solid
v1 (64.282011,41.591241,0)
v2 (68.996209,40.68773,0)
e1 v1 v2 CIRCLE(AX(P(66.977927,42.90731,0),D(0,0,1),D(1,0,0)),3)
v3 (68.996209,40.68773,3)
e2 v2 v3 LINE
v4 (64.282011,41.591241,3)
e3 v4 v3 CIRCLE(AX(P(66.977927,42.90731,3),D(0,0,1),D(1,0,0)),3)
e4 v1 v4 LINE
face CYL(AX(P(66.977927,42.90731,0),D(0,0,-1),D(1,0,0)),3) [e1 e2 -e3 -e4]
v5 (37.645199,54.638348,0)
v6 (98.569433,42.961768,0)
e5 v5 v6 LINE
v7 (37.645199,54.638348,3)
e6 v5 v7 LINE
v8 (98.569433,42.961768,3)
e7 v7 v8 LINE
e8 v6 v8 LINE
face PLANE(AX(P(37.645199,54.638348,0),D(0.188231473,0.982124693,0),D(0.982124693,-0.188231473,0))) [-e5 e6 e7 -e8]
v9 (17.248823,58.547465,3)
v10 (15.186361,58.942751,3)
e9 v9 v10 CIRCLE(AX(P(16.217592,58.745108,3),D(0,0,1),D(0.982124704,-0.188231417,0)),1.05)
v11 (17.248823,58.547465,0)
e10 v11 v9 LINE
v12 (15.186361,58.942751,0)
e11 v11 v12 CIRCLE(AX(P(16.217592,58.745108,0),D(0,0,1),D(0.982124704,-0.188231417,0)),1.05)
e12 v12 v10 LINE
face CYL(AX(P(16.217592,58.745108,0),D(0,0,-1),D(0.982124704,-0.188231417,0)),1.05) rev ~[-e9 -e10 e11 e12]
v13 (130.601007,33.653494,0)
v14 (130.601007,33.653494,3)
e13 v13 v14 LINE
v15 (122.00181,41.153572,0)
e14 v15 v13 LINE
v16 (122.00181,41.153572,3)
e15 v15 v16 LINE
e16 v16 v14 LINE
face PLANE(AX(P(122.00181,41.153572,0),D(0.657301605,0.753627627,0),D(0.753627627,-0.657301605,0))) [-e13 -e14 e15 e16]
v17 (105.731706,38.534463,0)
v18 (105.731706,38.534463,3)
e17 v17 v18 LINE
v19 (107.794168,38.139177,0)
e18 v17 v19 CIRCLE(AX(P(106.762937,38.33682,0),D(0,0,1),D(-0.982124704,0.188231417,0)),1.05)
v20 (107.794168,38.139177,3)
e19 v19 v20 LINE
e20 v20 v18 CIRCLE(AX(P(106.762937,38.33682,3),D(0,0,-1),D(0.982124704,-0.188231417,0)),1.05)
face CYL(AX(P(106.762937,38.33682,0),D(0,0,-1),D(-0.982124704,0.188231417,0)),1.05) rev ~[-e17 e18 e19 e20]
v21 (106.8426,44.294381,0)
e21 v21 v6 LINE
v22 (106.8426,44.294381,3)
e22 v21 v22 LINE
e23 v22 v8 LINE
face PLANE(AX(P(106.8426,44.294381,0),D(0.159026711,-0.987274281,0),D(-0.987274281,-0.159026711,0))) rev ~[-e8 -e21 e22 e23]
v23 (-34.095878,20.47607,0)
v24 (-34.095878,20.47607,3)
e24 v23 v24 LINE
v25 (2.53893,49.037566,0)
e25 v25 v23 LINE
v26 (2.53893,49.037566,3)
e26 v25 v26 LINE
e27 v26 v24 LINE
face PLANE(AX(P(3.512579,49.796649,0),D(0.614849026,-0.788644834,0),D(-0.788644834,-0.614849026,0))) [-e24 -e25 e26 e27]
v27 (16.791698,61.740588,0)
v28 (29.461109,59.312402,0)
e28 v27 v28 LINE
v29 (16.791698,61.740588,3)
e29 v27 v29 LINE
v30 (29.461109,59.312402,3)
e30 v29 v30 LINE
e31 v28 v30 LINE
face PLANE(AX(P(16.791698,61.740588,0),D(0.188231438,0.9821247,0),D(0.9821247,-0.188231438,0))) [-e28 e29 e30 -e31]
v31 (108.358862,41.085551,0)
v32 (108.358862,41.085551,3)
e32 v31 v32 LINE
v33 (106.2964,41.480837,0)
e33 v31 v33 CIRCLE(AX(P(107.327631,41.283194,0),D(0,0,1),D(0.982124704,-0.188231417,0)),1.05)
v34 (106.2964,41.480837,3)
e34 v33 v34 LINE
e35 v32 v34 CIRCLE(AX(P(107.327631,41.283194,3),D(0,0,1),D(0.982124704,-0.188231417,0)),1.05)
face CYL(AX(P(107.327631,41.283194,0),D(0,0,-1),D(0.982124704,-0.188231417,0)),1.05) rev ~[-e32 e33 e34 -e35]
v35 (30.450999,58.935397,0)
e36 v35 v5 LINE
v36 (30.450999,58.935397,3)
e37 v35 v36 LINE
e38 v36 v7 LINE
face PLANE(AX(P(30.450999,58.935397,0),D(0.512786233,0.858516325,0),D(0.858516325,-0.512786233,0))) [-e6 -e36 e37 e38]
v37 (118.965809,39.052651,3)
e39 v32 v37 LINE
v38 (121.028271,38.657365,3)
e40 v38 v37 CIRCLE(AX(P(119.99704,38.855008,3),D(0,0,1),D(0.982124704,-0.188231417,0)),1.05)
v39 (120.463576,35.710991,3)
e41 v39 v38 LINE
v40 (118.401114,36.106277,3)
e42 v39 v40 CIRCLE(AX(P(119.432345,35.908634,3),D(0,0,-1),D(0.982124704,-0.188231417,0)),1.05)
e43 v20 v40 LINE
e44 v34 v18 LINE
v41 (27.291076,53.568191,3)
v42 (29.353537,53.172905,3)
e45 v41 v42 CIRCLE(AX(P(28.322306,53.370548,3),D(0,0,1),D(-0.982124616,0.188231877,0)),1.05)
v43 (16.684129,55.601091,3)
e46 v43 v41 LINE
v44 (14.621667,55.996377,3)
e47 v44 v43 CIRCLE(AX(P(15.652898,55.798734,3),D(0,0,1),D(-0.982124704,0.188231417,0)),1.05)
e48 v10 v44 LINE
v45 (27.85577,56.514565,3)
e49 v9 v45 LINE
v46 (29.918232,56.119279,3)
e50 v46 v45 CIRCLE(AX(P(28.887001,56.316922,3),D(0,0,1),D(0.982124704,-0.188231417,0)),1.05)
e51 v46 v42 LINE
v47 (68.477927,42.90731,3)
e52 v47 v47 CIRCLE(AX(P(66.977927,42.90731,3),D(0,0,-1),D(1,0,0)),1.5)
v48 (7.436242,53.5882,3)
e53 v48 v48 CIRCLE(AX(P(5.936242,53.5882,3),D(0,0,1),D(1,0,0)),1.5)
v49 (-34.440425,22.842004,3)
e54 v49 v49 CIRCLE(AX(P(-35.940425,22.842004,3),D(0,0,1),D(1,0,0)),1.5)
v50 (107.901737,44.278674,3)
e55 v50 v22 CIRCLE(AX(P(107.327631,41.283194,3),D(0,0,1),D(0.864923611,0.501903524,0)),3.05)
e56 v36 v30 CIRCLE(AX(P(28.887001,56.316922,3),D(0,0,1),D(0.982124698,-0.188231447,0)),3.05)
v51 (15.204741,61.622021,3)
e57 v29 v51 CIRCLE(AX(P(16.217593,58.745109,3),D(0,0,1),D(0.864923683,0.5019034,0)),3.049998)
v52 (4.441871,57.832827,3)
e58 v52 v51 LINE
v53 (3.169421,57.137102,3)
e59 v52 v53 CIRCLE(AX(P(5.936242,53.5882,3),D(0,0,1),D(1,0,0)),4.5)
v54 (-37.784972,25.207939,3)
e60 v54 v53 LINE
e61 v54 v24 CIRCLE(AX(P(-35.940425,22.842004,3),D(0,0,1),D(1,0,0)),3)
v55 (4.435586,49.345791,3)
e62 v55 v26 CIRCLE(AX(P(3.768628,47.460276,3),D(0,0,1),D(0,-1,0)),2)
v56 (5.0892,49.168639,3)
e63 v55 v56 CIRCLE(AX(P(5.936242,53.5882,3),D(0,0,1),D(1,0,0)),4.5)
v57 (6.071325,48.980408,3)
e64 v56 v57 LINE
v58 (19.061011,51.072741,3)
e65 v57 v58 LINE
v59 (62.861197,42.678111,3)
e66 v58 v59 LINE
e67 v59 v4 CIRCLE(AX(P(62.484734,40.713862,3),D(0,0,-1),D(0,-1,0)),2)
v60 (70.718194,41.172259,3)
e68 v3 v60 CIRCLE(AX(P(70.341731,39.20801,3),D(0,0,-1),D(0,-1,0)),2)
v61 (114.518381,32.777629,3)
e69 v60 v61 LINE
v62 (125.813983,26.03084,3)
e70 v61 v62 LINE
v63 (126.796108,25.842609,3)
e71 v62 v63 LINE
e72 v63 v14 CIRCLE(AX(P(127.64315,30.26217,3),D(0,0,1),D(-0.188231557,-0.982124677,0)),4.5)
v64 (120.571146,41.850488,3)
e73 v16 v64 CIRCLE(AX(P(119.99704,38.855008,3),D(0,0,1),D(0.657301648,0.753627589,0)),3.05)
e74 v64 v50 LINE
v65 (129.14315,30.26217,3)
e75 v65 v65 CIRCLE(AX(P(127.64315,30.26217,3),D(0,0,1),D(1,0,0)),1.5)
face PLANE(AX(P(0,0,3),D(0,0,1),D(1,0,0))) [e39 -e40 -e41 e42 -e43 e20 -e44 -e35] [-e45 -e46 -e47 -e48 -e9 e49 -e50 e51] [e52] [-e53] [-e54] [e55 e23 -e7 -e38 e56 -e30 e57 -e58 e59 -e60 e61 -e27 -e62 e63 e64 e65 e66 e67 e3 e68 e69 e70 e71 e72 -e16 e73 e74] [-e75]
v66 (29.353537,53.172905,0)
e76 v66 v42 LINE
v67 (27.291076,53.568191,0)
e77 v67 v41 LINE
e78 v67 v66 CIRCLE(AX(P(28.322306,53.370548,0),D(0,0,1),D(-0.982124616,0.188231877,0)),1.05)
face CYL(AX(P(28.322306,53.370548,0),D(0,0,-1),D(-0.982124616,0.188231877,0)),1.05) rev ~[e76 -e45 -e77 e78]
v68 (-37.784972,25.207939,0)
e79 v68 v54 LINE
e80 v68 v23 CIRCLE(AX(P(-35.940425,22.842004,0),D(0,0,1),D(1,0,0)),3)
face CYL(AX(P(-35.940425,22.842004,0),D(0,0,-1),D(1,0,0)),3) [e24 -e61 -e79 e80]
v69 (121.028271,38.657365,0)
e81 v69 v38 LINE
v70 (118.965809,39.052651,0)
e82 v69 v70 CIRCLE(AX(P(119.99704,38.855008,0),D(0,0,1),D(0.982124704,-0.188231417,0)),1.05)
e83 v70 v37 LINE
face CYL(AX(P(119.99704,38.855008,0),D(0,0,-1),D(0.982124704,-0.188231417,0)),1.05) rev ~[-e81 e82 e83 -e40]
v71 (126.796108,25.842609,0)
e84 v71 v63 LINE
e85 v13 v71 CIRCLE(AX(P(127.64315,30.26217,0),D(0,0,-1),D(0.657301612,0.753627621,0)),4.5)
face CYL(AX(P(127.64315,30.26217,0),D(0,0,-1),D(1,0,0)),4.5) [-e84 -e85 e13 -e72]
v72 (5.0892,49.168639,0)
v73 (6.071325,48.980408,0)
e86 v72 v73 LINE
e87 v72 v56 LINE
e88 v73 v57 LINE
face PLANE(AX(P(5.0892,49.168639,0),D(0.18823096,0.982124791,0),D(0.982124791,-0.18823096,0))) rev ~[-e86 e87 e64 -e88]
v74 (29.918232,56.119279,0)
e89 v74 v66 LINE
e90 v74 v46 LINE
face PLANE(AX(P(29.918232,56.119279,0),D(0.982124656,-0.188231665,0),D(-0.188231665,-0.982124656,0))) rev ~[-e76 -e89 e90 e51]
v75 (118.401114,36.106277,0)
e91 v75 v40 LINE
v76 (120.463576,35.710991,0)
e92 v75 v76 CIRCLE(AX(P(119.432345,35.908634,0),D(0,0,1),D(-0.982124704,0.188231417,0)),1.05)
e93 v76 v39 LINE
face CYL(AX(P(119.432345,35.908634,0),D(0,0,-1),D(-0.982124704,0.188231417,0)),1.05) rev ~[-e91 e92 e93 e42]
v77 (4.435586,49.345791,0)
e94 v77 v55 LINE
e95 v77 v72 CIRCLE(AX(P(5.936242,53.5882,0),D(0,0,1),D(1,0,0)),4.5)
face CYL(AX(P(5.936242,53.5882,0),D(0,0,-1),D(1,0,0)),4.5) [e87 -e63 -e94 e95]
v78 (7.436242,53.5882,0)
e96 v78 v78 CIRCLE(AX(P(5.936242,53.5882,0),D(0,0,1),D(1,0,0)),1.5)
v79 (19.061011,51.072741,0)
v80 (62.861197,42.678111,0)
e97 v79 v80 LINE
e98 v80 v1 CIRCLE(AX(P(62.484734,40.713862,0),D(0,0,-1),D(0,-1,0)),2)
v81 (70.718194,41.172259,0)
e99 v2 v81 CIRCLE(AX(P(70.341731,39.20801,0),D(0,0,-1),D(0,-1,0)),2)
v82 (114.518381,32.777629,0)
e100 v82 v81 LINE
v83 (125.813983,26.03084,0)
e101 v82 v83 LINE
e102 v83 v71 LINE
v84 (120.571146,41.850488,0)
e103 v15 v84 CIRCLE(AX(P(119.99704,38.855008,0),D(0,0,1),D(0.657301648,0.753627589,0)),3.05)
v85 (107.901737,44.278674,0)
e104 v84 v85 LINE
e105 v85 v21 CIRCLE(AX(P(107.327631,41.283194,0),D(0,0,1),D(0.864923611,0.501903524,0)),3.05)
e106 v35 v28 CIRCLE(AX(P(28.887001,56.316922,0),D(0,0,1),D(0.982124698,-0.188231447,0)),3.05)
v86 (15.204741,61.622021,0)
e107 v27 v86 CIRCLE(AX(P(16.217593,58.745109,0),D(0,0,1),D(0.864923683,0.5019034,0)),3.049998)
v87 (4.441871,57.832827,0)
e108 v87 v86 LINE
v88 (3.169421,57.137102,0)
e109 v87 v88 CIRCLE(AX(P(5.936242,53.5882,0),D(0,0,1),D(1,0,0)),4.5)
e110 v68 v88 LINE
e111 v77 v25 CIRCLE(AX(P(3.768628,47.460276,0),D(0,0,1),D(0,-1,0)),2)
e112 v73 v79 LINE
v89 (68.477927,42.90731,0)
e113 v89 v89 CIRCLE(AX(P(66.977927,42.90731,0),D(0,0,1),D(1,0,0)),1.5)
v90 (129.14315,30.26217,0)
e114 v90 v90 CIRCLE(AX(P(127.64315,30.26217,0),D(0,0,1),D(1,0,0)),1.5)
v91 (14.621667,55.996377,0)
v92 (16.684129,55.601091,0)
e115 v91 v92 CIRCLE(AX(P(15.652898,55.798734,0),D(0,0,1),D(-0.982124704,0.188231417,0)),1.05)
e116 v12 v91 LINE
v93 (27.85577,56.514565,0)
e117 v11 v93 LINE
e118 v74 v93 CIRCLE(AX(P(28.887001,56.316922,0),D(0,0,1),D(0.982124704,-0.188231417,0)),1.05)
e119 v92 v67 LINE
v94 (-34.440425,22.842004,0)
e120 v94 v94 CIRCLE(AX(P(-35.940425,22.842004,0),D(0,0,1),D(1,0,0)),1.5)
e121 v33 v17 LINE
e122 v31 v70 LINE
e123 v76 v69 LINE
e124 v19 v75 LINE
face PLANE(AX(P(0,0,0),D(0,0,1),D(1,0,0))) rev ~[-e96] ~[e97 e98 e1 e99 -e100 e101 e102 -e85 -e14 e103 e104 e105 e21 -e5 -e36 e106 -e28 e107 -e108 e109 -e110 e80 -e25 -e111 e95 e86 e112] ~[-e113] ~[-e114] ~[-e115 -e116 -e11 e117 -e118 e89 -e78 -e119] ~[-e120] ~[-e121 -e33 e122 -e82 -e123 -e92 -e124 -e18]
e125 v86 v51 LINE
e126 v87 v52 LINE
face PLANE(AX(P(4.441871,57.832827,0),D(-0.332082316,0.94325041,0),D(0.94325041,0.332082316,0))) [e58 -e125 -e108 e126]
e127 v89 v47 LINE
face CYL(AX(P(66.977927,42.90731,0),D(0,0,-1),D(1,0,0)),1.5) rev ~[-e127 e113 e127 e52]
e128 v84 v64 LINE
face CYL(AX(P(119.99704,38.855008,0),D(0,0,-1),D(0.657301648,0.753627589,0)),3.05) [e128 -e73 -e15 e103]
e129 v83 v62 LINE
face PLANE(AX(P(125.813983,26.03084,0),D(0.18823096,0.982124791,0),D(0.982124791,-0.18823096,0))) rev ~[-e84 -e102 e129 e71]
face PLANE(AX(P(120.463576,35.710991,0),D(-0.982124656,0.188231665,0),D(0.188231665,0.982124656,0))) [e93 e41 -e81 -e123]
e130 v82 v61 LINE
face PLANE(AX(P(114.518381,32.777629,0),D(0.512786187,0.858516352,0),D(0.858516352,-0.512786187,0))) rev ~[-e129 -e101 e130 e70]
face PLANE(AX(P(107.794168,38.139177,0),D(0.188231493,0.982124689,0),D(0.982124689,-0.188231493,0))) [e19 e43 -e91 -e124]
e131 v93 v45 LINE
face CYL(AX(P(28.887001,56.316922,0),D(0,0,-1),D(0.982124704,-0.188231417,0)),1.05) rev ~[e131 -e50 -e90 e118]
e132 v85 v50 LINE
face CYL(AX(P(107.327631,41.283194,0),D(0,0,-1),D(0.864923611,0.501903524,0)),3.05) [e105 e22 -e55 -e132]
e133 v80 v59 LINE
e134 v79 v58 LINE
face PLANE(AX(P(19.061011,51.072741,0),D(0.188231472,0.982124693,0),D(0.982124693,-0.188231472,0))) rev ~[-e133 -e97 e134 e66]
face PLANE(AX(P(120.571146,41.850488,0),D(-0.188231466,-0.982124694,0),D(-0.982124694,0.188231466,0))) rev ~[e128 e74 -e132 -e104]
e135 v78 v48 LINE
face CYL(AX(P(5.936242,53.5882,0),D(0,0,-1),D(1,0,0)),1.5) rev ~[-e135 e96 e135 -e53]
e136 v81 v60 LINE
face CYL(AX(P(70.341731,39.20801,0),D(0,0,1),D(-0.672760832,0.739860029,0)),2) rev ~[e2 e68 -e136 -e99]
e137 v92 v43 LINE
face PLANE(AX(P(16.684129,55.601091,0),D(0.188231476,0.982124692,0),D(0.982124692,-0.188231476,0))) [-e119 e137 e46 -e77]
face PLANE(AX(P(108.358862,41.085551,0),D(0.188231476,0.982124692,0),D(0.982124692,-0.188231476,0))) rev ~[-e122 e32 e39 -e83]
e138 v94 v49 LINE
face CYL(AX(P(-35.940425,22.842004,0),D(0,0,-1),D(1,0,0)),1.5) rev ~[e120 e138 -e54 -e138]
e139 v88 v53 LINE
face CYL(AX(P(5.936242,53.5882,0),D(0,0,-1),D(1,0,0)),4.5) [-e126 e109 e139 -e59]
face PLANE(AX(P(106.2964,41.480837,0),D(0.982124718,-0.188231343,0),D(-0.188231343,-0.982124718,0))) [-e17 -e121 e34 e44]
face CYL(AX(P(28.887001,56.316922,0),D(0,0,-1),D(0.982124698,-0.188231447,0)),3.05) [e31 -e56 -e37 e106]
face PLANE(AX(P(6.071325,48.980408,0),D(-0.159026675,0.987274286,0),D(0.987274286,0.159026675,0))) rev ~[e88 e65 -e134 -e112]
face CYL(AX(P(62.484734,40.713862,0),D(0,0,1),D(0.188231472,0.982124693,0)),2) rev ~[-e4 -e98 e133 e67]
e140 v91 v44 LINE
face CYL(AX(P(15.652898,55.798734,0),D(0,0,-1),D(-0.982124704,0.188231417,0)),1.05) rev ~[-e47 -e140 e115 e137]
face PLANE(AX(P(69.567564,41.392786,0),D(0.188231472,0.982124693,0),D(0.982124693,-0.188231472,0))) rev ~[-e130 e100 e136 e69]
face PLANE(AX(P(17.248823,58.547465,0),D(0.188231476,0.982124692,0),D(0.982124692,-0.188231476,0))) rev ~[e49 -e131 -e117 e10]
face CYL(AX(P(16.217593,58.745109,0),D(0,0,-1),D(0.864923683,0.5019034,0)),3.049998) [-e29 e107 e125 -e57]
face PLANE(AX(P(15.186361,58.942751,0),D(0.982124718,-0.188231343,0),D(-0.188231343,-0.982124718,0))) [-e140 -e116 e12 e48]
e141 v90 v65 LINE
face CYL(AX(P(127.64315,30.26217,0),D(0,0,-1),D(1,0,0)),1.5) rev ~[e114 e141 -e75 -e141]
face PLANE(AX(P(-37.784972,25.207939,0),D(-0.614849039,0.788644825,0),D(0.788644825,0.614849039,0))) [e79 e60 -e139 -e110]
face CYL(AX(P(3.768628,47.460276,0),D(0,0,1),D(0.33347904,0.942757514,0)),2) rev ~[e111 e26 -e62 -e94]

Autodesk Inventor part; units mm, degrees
ref_plane "YZ Plane" through (0, 0, 0) normal (1, 0, 0) x (0, 1, 0)
ref_plane "XZ Plane" through (0, 0, 0) normal (0, 1, 0) x (-1, 0, 0)
ref_plane "XY Plane" through (0, 0, 0) normal (0, 0, 1) x (1, 0, 0)
sketch "スケッチ1" plane through (0, 0, 0) normal (0, 0, 1) x (1, 0, 0)
  circle A0 centre (127.64315, 30.26217) radius 1.5
  circle A1 centre (5.936242, 53.5882) radius 1.5
  line L0 (5.936242, 53.5882) -> (127.64315, 30.26217) construction
  circle A2 centre (5.936242, 53.5882) radius 4.025
  circle A3 centre (127.64315, 30.26217) radius 4.025
  arc A4 (127.25169, 23.248085) -> (128.965476, 37.161596) centre (127.64315, 30.26217) ccw
  line L1 (12.835668, 52.265874) -> (13.400362, 55.212248)
  line L2 (15.462824, 54.816962) -> (26.069771, 52.784062)
  line L3 (28.132233, 52.388776) -> (27.567538, 49.442402)
  line L4 (14.89813, 51.870588) -> (25.505076, 49.837688)
  line L5 (120.743724, 31.584496) -> (121.308418, 34.53087)
  line L6 (119.245956, 34.926156) -> (108.63901, 36.959056)
  line L7 (106.576548, 37.354342) -> (106.011853, 34.407968)
  line L8 (108.074315, 34.012682) -> (118.681262, 31.979782)
  circle A5 centre (19.354562, 46.434577) radius 3
  circle A6 centre (112.530747, 28.576671) radius 3
  line L9 (7.258568, 60.487626) -> (128.965476, 37.161596)
  arc A7 (17.926333, 42.16724) -> (21.546529, 42.504529) centre (19.354562, 46.434577) ccw
  arc A8 (109.041036, 25.735559) -> (112.27999, 24.083663) centre (112.530747, 28.576671) ccw
  line L10 (3.706619, 46.926413) -> (17.926333, 42.16724)
  line L11 (112.27999, 24.083663) -> (127.25169, 23.248085)
  circle A9 centre (19.354562, 46.434577) radius 1.5
  circle A10 centre (112.530747, 28.576671) radius 1.5
  line L12 (32.344248, 48.52691) -> (21.546529, 42.504529)
  line L13 (109.041036, 25.735559) -> (101.235144, 35.32346)
  line L14 (32.344248, 48.52691) -> (101.235144, 35.32346)
  arc A11 (108.63901, 36.959056) -> (106.576548, 37.354342) centre (107.607779, 37.156699) ccw
  arc A12 (106.011853, 34.407968) -> (108.074315, 34.012682) centre (107.043084, 34.210325) ccw
  arc A13 (121.308418, 34.53087) -> (119.245956, 34.926156) centre (120.277187, 34.728513) ccw
  arc A14 (118.681262, 31.979782) -> (120.743724, 31.584496) centre (119.712493, 31.782139) ccw
  arc A15 (28.132233, 52.388776) -> (26.069771, 52.784062) centre (27.101002, 52.586419) ccw
  arc A16 (25.505076, 49.837688) -> (27.567538, 49.442402) centre (26.536307, 49.640045) ccw
  arc A17 (15.462824, 54.816962) -> (13.400362, 55.212248) centre (14.431593, 55.014605) ccw
  arc A18 (12.835668, 52.265874) -> (14.89813, 51.870588) centre (13.866899, 52.068231) ccw
  line L15 (5.936242, 53.5882) -> (-35.940425, 22.842004) construction
  circle A19 centre (-35.940425, 22.842004) radius 1.5
  arc A20 (-37.715892, 25.26021) -> (-34.164958, 20.423799) centre (-35.940425, 22.842004) ccw
  line L16 (-37.715892, 25.26021) -> (-0.959545, 52.247024)
  line L17 (-34.164958, 20.423799) -> (2.591389, 47.410613)
  arc A21 (7.258568, 60.487626) -> (-0.959545, 52.247024) centre (5.936242, 53.5882) ccw
  arc A22 (2.591389, 47.410613) -> (3.706619, 46.926413) centre (5.936242, 53.5882) ccw
  point P0 (0, 0)
  point P1 (0, 0)
  dimension "d0" = 8.05
  dimension "d1" = 8.05
  dimension "d2" = 3
  dimension "d3" = 3
  dimension "d4" = 15
  dimension "d5" = 3
  dimension "d6" = 15
  dimension "d7" = 6
  dimension "d8" = 6
  dimension "d9" = 9
  dimension "d10" = 9
  dimension "d11" = 3
  dimension "d12" = 3
  dimension "d13" = 7.5
  dimension "d14" = 7.5
  dimension "d15" = 40
  dimension "d16" = 40
  dimension "d17" = 2.1
  dimension "d18" = 2.1
  dimension "d19" = 2.1
  dimension "d20" = 2.1
  dimension "d21" = 2.1
  dimension "d22" = 2.1
  dimension "d23" = 2.1
  dimension "d24" = 2.1
  dimension "d25" = 3
  dimension "d26" = 6
  dimension "d27" = 3
  dimension "d28" = 3
sketch "スケッチ3" plane through (0, 0, 0) normal (0, 0, 1) x (1, 0, 0)
  circle A0 centre (0, 0) radius 10.1 construction
  circle A1 centre (25.320198, -9.936175) radius 17.1 construction
  circle A2 centre (110.474331, -16.4118) radius 28.1 construction
  circle A3 centre (62.413099, -12.756939) radius 20.1 construction
  circle A4 centre (-21.690847, -16.4118) radius 17.1 construction
  circle A5 centre (-105.525669, -16.4118) radius 28.1 construction
  line L0 (-170.91498, -81.4118) -> (490.004419, -81.4118)
  line L1 (-105.525669, -16.4118) -> (-21.690847, -16.4118) construction
  line L2 (110.474331, -16.4118) -> (25.320198, -9.936175) construction
  line L3 (110.474331, -16.4118) -> (104.150058, -0.631953)
  line L4 (104.150058, -0.631953) -> (95.593688, 20.717252) construction
  line L5 (95.593688, 20.717252) -> (70.474331, -10.4118) construction
  line L6 (70.474331, -10.4118) -> (110.474331, -16.4118) construction
  line L7 (-137.681852, 53.5882) -> (165.818568, 53.5882)
  line L8 (25.320198, -9.936175) -> (108.686903, 8.5882) construction
  line L9 (25.320198, -9.936175) -> (102.538646, -46.4118) construction
  line L10 (25.320198, -9.936175) -> (5.936242, 53.5882) construction
  line L11 (5.936242, 53.5882) -> (127.64315, 30.26217)
  line L12 (127.64315, 30.26217) -> (110.474331, -16.4118) construction
  line L13 (102.538646, -46.4118) -> (118.068109, 0.832921) construction
  line L14 (118.068109, 0.832921) -> (5.936242, 53.5882) construction
  line L15 (108.686903, 8.5882) -> (129.858294, 53.5882) construction
  line L16 (129.858294, 53.5882) -> (5.936242, 53.5882) construction
  line L17 (119.272599, 31.0882) -> (366.444098, 68.5882) construction
  line L18 (119.05874, 6.925185) -> (362.021337, 65.824902) construction
  line L19 (110.303378, -22.78944) -> (351.062397, 44.553669) construction
  line L20 (127.64315, 30.26217) -> (4.192658, 19.461651) construction
  circle A6 centre (80.474331, 23.123973) radius 3 construction
  circle A7 centre (80.474331, 23.123973) radius 1.5
  arc A8 (79.800999, 27.573313) -> (76.161969, 24.409872) centre (80.474331, 23.123973) ccw
  circle A9 centre (70.474331, -10.4118) radius 1.5
  arc A10 (66.161969, -9.125901) -> (69.424217, -14.787558) centre (70.474331, -10.4118) ccw
  circle A11 centre (150.474331, 0.5882) radius 1.5
  arc A12 (152.562257, -3.398097) -> (154.040845, 3.33228) centre (150.474331, 0.5882) ccw
  circle A13 centre (127.64315, 30.26217) radius 1.5
  arc A14 (131.281576, 32.91016) -> (126.969818, 34.71151) centre (127.64315, 30.26217) ccw
  circle A15 centre (110.474331, -16.4118) radius 5
  arc A16 (108.607462, -24.190926) -> (114.186199, -23.49855) centre (110.474331, -16.4118) ccw
  line L21 (76.161969, 24.409872) -> (66.161969, -9.125901)
  line L22 (69.424217, -14.787558) -> (108.607462, -24.190926)
  line L23 (114.186199, -23.49855) -> (152.562257, -3.398097)
  line L24 (154.040845, 3.33228) -> (131.209664, 33.00625)
  line L25 (126.969818, 34.71151) -> (79.800999, 27.573313)
  circle A17 centre (-145.525669, 0.5882) radius 1.5
  arc A18 (-149.092184, 3.33228) -> (-147.613596, -3.398097) centre (-145.525669, 0.5882) ccw
  circle A19 centre (-105.525669, -16.4118) radius 5
  arc A20 (-109.237538, -23.49855) -> (-103.6588, -24.190926) centre (-105.525669, -16.4118) ccw
  circle A21 centre (-65.525669, -10.4118) radius 1.5
  arc A22 (-64.475556, -14.787558) -> (-61.213308, -9.125901) centre (-65.525669, -10.4118) ccw
  circle A23 centre (0, 0) radius 20.05 construction
  circle A24 centre (110.474331, -16.4118) radius 30.1 construction
  circle A25 centre (62.413099, -12.756939) radius 22.1 construction
  circle A26 centre (25.320198, -9.936175) radius 19.1 construction
  circle A27 centre (0, 0) radius 12.1 construction
  circle A28 centre (-21.690847, -16.4118) radius 19.1 construction
  circle A29 centre (-105.525669, -16.4118) radius 30.1 construction
  circle A30 centre (0, 0) radius 20.55 construction
  circle A31 centre (95.593688, 20.717252) radius 4.025 construction
  circle A32 centre (95.593688, 20.717252) radius 6.025 construction
  circle A33 centre (-75.525669, 23.123973) radius 1.5
  arc A34 (-71.213308, 24.409872) -> (-74.852338, 27.573313) centre (-75.525669, 23.123973) ccw
  circle A35 centre (-122.694488, 30.26217) radius 1.5
  arc A36 (-122.021157, 34.71151) -> (-126.261003, 33.00625) centre (-122.694488, 30.26217) ccw
  line L26 (-126.261003, 33.00625) -> (-149.092184, 3.33228)
  line L27 (-147.613596, -3.398097) -> (-109.237538, -23.49855)
  line L28 (-103.6588, -24.190926) -> (-64.475556, -14.787558)
  line L29 (-61.213308, -9.125901) -> (-71.213308, 24.409872)
  line L30 (-74.852338, 27.573313) -> (-122.021157, 34.71151)
  circle A37 centre (14, -17.4118) radius 2.29213 construction
  circle A38 centre (-14, -17.4118) radius 2.29213 construction
  circle A39 centre (-14, -17.4118) radius 14 construction
  circle A40 centre (14, -17.4118) radius 14 construction
  line L31 (-170.651239, -31.4118) -> (202.86558, -31.4118)
  line L32 (5.936242, 53.5882) -> (-42.252867, 34.177029) construction
  line L33 (5.936242, 53.5882) -> (-29.404465, 15.509095) construction
  circle A41 centre (5.936242, 53.5882) radius 1.5
  arc A42 (9.961109, 55.600773) -> (4.254869, 57.762285) centre (5.936242, 53.5882) ccw
  line L34 (-21.690847, -16.4118) -> (-99.974162, 13.5882) construction
  line L35 (-21.690847, -16.4118) -> (-101.711328, -41.4118) construction
  line L36 (9.961109, 55.600773) -> (31.415648, 12.694659)
  circle A43 centre (-50.601037, 30.814282) radius 1.5
  arc A44 (-52.28241, 34.988367) -> (-54.424801, 28.441767) centre (-50.601037, 30.814282) ccw
  line L37 (4.254869, 57.762285) -> (-52.28241, 34.988367)
  line L38 (-54.424801, 28.441767) -> (-46.715132, 16.016156)
  circle A45 centre (27.390781, 10.682087) radius 3 construction
  circle A46 centre (-84.86606, 5.271327) radius 4.5 construction
  circle A47 centre (-132.017427, -1.981251) radius 4.5 construction
  line L39 (-132.701548, 2.466443) -> (-85.550181, 9.71902) construction
  arc A48 (26.900287, 6.208898) -> (31.415648, 12.694659) centre (27.390781, 10.682087) ccw
  arc A49 (-46.715132, 16.016156) -> (-43.381863, 13.915483) centre (-42.891368, 18.388671) ccw
  line L40 (-43.381863, 13.915483) -> (26.900287, 6.208898)
  circle A50 centre (-42.252867, 34.177029) radius 3 construction
  circle A51 centre (25.320198, -9.936175) radius 4.025 construction
  circle A52 centre (-21.690847, -16.4118) radius 4.025 construction
  circle A53 centre (-42.891368, 18.388671) radius 1.5
  circle A54 centre (27.390781, 10.682087) radius 1.5
  circle A55 centre (-57.813011, 39.770535) radius 4.5 construction
  circle A56 centre (-99.303951, 63.315241) radius 4.5 construction
  line L41 (5.936242, 53.5882) -> (-35.940425, 22.842004) construction
  circle A57 centre (-58.005574, -24.479052) radius 20.1 construction
  circle A58 centre (-58.005574, -24.479052) radius 22.1 construction
  line L42 (-53.326057, 39.428119) -> (-56.279689, 0.724331) construction
  circle A59 centre (-42.252867, 34.177029) radius 4.5
  dimension "d125" = 9
  dimension "d126" = 9
  dimension "d141" = 9
  dimension "d166" = 8.07688
  dimension "d167" = 8.07688
  dimension "d170" = 61.9691
  dimension "d171" = 61.9691
  dimension "d37" = 20.2
  dimension "d38" = 34.2
  dimension "d39" = 56.2
  dimension "d40" = 40.2
  dimension "d41" = 216
  dimension "d42" = 65
  dimension "d43" = 65
  dimension "d44" = 34.2
  dimension "d45" = 56.2
  dimension "d46" = 17
  dimension "d47" = 23
  dimension "d48" = 40
  dimension "d49" = 40
  dimension "d50" = 6
  dimension "d51" = 135
  dimension "d52" = 25
  dimension "d53" = 30
  dimension "d54" = 5
  dimension "d55" = 2
  dimension "d56" = 250
  dimension "d57" = 150
  dimension "d58" = 250
  dimension "d59" = 250
  dimension "d60" = 123.823
  dimension "d61" = 123.823
  dimension "d62" = 123.823
  dimension "d63" = 6
  dimension "d64" = 3
  dimension "d65" = 9
  dimension "d66" = 3
  dimension "d67" = 9
  dimension "d68" = 3
  dimension "d69" = 9
  dimension "d70" = 40
  dimension "d71" = 17
  dimension "d72" = 3
  dimension "d73" = 9
  dimension "d74" = 10
  dimension "d75" = 3
  dimension "d76" = 3
  dimension "d77" = 9
  dimension "d78" = 40
  dimension "d79" = 17
  dimension "d80" = 10
  dimension "d81" = 3
  dimension "d82" = 3
  dimension "d83" = 9
  dimension "d84" = 40
  dimension "d85" = 6
  dimension "d86" = 40.1
  dimension "d87" = 2
  dimension "d88" = 2
  dimension "d89" = 2
  dimension "d90" = 2
  dimension "d91" = 2
  dimension "d92" = 2
  dimension "d93" = 0.5
  dimension "d94" = 8.05
  dimension "d95" = 2
  dimension "d96" = 3
  dimension "d97" = 9
  dimension "d98" = 3
  dimension "d99" = 9
  dimension "d100" = 46.67397
sketch "スケッチ2" plane through (0, 0, 0) normal (0, 0, 1) x (1, 0, 0)
  circle A0 centre (-35.940425, 22.842004) radius 1.5
  circle A1 centre (5.936242, 53.5882) radius 1.5
  circle A2 centre (127.64315, 30.26217) radius 1.5
  line L0 (19.061011, 51.072741) -> (114.518381, 32.777629)
  circle A3 centre (5.936242, 53.5882) radius 4.5
  circle A4 centre (127.64315, 30.26217) radius 4.5
  circle A5 centre (-35.940425, 22.842004) radius 3
  line L1 (5.0892, 49.168639) -> (6.071325, 48.980408)
  line L2 (6.071325, 48.980408) -> (19.061011, 51.072741)
  line L3 (114.518381, 32.777629) -> (125.813983, 26.03084)
  line L4 (125.813983, 26.03084) -> (126.796108, 25.842609)
  line L5 (4.441871, 57.832827) -> (15.204741, 61.622021)
  line L6 (-37.784972, 25.207939) -> (3.169421, 57.137102)
  line L7 (3.512579, 49.796649) -> (-34.095878, 20.47607)
  line L8 (122.00181, 41.153572) -> (130.601007, 33.653494)
  circle A6 centre (80.318062, 36.277771) radius 3
  circle A7 centre (80.318062, 36.277771) radius 4.5
  line L9 (128.210589, 34.72625) -> (80.885502, 40.741852)
  circle A8 centre (80.474331, 23.123973) radius 1.5
  line L10 (120.463576, 35.710991) -> (121.028271, 38.657365)
  line L11 (15.186361, 58.942751) -> (14.621667, 55.996377)
  circle A9 centre (66.977927, 42.90731) radius 1.5
  circle A10 centre (66.977927, 42.90731) radius 3
  line L12 (29.918232, 56.119279) -> (29.353537, 53.172905)
  arc A11 (17.248823, 58.547465) -> (15.186361, 58.942751) centre (16.217592, 58.745108) ccw
  arc A12 (29.918232, 56.119279) -> (27.85577, 56.514565) centre (28.887001, 56.316922) ccw
  arc A13 (27.291076, 53.568191) -> (29.353537, 53.172905) centre (28.322307, 53.370548) ccw
  arc A14 (14.621667, 55.996377) -> (16.684129, 55.601091) centre (15.652898, 55.798734) ccw
  line L13 (17.248823, 58.547465) -> (27.85577, 56.514565)
  line L14 (16.684129, 55.601091) -> (27.291076, 53.568191)
  arc A15 (31.882481, 55.742816) -> (27.00191, 58.714615) centre (28.887001, 56.316922) ccw
  line L15 (27.00191, 58.714615) -> (18.855609, 60.275914)
  arc A16 (18.855609, 60.275914) -> (15.204741, 61.622021) centre (16.217592, 58.745108) ccw
  line L16 (106.2964, 41.480837) -> (105.731706, 38.534463)
  arc A17 (108.358862, 41.085551) -> (106.2964, 41.480837) centre (107.327631, 41.283194) ccw
  arc A18 (121.028271, 38.657365) -> (118.965809, 39.052651) centre (119.99704, 38.855008) ccw
  arc A19 (118.401114, 36.106277) -> (120.463576, 35.710991) centre (119.432345, 35.908634) ccw
  arc A20 (105.731706, 38.534463) -> (107.794168, 38.139177) centre (106.762937, 38.33682) ccw
  line L17 (31.882481, 55.742816) -> (104.332151, 41.8573)
  line L18 (108.358862, 41.085551) -> (118.965809, 39.052651)
  line L19 (107.794168, 38.139177) -> (118.401114, 36.106277)
  arc A21 (122.00181, 41.153572) -> (118.111949, 41.252701) centre (119.99704, 38.855008) ccw
  line L20 (118.111949, 41.252701) -> (109.965648, 42.814)
  arc A22 (109.965648, 42.814) -> (104.332151, 41.8573) centre (107.327631, 41.283194) ccw
  line L21 (30.450999, 58.935397) -> (37.645199, 54.638348)
  line L22 (16.791698, 61.740588) -> (29.461109, 59.312402)
  line L23 (120.571146, 41.850488) -> (107.901737, 44.278674)
  line L24 (106.8426, 44.294381) -> (98.569433, 42.961768)
  point P0 (0, 0)
  dimension "d36" = 9
  dimension "d29" = 9
  dimension "d30" = 9
  dimension "d31" = 6
  dimension "d35" = 6
  dimension "d155" = 47.70588
  dimension "d156" = 47.70588
  dimension "d163" = 3
  dimension "d164" = 3
  dimension "d166" = 8.07688
  dimension "d167" = 8.07688
  dimension "d168" = 3
  dimension "d169" = 6
  dimension "d170" = 61.9691
  dimension "d171" = 61.9691
  dimension "d174" = 15
  dimension "d175" = 2.1
  dimension "d176" = 2
  dimension "d178" = 2
  dimension "d179" = 2
  dimension "d180" = 15
  dimension "d181" = 2.1
  dimension "d182" = 7
  dimension "d183" = 2
  dimension "d184" = 2
  dimension "d187" = 160
  dimension "d188" = 160
  dimension "d189" = 160
  dimension "d190" = 160
  dimension "d191" = 1
  dimension "d192" = 1
extrude "押し出し1" add sketch "スケッチ2" along normal blind 3 contours L2 L1 A3 L5 A16 L15 A15 L17 A22 L20 A21 L8 A4 L9 L10 A18 L18 A17 L16 A20 A7 L0 A10 | A10 L0 A9 | L0 A9 A10 | A9 L0 | A3 | A7 L0 | L7 A5 L6 A3 | L9 A20 A19 A4 L4 L3 L0 A7 | A5 | A20 L19 A19 L9 | L22 A15 L15 A16 | A4 | L21 L17 A15 | L24 A22 L17 | A21 L20 A22 L23 picked at (66.846156, 43.480469) picked at (82.873228, 39.071854)
extrude "押し出し2" cut sketch "スケッチ2" along normal blind 3 contours A9 L0 | L0 A9
fillet "フィレット1" radius 2 1 edges at (3.5126, 49.7966, 1.5)
fillet "フィレット2" radius 2 2 edges at (64.0118, 42.4576, 1.5) (69.5676, 41.3928, 1.5)
equation "\"d16\" = d15"
equation "\"d167\" = d166"
equation "\"d171\" = d170"
equation "\"d44\" = d38"
equation "\"d45\" = d39"
equation "\"d61\" = d60"
equation "\"d62\" = d60"
equation "\"d156\" = d155"
properties part number "台形サスバー２" material "アルミニウム 7075"
